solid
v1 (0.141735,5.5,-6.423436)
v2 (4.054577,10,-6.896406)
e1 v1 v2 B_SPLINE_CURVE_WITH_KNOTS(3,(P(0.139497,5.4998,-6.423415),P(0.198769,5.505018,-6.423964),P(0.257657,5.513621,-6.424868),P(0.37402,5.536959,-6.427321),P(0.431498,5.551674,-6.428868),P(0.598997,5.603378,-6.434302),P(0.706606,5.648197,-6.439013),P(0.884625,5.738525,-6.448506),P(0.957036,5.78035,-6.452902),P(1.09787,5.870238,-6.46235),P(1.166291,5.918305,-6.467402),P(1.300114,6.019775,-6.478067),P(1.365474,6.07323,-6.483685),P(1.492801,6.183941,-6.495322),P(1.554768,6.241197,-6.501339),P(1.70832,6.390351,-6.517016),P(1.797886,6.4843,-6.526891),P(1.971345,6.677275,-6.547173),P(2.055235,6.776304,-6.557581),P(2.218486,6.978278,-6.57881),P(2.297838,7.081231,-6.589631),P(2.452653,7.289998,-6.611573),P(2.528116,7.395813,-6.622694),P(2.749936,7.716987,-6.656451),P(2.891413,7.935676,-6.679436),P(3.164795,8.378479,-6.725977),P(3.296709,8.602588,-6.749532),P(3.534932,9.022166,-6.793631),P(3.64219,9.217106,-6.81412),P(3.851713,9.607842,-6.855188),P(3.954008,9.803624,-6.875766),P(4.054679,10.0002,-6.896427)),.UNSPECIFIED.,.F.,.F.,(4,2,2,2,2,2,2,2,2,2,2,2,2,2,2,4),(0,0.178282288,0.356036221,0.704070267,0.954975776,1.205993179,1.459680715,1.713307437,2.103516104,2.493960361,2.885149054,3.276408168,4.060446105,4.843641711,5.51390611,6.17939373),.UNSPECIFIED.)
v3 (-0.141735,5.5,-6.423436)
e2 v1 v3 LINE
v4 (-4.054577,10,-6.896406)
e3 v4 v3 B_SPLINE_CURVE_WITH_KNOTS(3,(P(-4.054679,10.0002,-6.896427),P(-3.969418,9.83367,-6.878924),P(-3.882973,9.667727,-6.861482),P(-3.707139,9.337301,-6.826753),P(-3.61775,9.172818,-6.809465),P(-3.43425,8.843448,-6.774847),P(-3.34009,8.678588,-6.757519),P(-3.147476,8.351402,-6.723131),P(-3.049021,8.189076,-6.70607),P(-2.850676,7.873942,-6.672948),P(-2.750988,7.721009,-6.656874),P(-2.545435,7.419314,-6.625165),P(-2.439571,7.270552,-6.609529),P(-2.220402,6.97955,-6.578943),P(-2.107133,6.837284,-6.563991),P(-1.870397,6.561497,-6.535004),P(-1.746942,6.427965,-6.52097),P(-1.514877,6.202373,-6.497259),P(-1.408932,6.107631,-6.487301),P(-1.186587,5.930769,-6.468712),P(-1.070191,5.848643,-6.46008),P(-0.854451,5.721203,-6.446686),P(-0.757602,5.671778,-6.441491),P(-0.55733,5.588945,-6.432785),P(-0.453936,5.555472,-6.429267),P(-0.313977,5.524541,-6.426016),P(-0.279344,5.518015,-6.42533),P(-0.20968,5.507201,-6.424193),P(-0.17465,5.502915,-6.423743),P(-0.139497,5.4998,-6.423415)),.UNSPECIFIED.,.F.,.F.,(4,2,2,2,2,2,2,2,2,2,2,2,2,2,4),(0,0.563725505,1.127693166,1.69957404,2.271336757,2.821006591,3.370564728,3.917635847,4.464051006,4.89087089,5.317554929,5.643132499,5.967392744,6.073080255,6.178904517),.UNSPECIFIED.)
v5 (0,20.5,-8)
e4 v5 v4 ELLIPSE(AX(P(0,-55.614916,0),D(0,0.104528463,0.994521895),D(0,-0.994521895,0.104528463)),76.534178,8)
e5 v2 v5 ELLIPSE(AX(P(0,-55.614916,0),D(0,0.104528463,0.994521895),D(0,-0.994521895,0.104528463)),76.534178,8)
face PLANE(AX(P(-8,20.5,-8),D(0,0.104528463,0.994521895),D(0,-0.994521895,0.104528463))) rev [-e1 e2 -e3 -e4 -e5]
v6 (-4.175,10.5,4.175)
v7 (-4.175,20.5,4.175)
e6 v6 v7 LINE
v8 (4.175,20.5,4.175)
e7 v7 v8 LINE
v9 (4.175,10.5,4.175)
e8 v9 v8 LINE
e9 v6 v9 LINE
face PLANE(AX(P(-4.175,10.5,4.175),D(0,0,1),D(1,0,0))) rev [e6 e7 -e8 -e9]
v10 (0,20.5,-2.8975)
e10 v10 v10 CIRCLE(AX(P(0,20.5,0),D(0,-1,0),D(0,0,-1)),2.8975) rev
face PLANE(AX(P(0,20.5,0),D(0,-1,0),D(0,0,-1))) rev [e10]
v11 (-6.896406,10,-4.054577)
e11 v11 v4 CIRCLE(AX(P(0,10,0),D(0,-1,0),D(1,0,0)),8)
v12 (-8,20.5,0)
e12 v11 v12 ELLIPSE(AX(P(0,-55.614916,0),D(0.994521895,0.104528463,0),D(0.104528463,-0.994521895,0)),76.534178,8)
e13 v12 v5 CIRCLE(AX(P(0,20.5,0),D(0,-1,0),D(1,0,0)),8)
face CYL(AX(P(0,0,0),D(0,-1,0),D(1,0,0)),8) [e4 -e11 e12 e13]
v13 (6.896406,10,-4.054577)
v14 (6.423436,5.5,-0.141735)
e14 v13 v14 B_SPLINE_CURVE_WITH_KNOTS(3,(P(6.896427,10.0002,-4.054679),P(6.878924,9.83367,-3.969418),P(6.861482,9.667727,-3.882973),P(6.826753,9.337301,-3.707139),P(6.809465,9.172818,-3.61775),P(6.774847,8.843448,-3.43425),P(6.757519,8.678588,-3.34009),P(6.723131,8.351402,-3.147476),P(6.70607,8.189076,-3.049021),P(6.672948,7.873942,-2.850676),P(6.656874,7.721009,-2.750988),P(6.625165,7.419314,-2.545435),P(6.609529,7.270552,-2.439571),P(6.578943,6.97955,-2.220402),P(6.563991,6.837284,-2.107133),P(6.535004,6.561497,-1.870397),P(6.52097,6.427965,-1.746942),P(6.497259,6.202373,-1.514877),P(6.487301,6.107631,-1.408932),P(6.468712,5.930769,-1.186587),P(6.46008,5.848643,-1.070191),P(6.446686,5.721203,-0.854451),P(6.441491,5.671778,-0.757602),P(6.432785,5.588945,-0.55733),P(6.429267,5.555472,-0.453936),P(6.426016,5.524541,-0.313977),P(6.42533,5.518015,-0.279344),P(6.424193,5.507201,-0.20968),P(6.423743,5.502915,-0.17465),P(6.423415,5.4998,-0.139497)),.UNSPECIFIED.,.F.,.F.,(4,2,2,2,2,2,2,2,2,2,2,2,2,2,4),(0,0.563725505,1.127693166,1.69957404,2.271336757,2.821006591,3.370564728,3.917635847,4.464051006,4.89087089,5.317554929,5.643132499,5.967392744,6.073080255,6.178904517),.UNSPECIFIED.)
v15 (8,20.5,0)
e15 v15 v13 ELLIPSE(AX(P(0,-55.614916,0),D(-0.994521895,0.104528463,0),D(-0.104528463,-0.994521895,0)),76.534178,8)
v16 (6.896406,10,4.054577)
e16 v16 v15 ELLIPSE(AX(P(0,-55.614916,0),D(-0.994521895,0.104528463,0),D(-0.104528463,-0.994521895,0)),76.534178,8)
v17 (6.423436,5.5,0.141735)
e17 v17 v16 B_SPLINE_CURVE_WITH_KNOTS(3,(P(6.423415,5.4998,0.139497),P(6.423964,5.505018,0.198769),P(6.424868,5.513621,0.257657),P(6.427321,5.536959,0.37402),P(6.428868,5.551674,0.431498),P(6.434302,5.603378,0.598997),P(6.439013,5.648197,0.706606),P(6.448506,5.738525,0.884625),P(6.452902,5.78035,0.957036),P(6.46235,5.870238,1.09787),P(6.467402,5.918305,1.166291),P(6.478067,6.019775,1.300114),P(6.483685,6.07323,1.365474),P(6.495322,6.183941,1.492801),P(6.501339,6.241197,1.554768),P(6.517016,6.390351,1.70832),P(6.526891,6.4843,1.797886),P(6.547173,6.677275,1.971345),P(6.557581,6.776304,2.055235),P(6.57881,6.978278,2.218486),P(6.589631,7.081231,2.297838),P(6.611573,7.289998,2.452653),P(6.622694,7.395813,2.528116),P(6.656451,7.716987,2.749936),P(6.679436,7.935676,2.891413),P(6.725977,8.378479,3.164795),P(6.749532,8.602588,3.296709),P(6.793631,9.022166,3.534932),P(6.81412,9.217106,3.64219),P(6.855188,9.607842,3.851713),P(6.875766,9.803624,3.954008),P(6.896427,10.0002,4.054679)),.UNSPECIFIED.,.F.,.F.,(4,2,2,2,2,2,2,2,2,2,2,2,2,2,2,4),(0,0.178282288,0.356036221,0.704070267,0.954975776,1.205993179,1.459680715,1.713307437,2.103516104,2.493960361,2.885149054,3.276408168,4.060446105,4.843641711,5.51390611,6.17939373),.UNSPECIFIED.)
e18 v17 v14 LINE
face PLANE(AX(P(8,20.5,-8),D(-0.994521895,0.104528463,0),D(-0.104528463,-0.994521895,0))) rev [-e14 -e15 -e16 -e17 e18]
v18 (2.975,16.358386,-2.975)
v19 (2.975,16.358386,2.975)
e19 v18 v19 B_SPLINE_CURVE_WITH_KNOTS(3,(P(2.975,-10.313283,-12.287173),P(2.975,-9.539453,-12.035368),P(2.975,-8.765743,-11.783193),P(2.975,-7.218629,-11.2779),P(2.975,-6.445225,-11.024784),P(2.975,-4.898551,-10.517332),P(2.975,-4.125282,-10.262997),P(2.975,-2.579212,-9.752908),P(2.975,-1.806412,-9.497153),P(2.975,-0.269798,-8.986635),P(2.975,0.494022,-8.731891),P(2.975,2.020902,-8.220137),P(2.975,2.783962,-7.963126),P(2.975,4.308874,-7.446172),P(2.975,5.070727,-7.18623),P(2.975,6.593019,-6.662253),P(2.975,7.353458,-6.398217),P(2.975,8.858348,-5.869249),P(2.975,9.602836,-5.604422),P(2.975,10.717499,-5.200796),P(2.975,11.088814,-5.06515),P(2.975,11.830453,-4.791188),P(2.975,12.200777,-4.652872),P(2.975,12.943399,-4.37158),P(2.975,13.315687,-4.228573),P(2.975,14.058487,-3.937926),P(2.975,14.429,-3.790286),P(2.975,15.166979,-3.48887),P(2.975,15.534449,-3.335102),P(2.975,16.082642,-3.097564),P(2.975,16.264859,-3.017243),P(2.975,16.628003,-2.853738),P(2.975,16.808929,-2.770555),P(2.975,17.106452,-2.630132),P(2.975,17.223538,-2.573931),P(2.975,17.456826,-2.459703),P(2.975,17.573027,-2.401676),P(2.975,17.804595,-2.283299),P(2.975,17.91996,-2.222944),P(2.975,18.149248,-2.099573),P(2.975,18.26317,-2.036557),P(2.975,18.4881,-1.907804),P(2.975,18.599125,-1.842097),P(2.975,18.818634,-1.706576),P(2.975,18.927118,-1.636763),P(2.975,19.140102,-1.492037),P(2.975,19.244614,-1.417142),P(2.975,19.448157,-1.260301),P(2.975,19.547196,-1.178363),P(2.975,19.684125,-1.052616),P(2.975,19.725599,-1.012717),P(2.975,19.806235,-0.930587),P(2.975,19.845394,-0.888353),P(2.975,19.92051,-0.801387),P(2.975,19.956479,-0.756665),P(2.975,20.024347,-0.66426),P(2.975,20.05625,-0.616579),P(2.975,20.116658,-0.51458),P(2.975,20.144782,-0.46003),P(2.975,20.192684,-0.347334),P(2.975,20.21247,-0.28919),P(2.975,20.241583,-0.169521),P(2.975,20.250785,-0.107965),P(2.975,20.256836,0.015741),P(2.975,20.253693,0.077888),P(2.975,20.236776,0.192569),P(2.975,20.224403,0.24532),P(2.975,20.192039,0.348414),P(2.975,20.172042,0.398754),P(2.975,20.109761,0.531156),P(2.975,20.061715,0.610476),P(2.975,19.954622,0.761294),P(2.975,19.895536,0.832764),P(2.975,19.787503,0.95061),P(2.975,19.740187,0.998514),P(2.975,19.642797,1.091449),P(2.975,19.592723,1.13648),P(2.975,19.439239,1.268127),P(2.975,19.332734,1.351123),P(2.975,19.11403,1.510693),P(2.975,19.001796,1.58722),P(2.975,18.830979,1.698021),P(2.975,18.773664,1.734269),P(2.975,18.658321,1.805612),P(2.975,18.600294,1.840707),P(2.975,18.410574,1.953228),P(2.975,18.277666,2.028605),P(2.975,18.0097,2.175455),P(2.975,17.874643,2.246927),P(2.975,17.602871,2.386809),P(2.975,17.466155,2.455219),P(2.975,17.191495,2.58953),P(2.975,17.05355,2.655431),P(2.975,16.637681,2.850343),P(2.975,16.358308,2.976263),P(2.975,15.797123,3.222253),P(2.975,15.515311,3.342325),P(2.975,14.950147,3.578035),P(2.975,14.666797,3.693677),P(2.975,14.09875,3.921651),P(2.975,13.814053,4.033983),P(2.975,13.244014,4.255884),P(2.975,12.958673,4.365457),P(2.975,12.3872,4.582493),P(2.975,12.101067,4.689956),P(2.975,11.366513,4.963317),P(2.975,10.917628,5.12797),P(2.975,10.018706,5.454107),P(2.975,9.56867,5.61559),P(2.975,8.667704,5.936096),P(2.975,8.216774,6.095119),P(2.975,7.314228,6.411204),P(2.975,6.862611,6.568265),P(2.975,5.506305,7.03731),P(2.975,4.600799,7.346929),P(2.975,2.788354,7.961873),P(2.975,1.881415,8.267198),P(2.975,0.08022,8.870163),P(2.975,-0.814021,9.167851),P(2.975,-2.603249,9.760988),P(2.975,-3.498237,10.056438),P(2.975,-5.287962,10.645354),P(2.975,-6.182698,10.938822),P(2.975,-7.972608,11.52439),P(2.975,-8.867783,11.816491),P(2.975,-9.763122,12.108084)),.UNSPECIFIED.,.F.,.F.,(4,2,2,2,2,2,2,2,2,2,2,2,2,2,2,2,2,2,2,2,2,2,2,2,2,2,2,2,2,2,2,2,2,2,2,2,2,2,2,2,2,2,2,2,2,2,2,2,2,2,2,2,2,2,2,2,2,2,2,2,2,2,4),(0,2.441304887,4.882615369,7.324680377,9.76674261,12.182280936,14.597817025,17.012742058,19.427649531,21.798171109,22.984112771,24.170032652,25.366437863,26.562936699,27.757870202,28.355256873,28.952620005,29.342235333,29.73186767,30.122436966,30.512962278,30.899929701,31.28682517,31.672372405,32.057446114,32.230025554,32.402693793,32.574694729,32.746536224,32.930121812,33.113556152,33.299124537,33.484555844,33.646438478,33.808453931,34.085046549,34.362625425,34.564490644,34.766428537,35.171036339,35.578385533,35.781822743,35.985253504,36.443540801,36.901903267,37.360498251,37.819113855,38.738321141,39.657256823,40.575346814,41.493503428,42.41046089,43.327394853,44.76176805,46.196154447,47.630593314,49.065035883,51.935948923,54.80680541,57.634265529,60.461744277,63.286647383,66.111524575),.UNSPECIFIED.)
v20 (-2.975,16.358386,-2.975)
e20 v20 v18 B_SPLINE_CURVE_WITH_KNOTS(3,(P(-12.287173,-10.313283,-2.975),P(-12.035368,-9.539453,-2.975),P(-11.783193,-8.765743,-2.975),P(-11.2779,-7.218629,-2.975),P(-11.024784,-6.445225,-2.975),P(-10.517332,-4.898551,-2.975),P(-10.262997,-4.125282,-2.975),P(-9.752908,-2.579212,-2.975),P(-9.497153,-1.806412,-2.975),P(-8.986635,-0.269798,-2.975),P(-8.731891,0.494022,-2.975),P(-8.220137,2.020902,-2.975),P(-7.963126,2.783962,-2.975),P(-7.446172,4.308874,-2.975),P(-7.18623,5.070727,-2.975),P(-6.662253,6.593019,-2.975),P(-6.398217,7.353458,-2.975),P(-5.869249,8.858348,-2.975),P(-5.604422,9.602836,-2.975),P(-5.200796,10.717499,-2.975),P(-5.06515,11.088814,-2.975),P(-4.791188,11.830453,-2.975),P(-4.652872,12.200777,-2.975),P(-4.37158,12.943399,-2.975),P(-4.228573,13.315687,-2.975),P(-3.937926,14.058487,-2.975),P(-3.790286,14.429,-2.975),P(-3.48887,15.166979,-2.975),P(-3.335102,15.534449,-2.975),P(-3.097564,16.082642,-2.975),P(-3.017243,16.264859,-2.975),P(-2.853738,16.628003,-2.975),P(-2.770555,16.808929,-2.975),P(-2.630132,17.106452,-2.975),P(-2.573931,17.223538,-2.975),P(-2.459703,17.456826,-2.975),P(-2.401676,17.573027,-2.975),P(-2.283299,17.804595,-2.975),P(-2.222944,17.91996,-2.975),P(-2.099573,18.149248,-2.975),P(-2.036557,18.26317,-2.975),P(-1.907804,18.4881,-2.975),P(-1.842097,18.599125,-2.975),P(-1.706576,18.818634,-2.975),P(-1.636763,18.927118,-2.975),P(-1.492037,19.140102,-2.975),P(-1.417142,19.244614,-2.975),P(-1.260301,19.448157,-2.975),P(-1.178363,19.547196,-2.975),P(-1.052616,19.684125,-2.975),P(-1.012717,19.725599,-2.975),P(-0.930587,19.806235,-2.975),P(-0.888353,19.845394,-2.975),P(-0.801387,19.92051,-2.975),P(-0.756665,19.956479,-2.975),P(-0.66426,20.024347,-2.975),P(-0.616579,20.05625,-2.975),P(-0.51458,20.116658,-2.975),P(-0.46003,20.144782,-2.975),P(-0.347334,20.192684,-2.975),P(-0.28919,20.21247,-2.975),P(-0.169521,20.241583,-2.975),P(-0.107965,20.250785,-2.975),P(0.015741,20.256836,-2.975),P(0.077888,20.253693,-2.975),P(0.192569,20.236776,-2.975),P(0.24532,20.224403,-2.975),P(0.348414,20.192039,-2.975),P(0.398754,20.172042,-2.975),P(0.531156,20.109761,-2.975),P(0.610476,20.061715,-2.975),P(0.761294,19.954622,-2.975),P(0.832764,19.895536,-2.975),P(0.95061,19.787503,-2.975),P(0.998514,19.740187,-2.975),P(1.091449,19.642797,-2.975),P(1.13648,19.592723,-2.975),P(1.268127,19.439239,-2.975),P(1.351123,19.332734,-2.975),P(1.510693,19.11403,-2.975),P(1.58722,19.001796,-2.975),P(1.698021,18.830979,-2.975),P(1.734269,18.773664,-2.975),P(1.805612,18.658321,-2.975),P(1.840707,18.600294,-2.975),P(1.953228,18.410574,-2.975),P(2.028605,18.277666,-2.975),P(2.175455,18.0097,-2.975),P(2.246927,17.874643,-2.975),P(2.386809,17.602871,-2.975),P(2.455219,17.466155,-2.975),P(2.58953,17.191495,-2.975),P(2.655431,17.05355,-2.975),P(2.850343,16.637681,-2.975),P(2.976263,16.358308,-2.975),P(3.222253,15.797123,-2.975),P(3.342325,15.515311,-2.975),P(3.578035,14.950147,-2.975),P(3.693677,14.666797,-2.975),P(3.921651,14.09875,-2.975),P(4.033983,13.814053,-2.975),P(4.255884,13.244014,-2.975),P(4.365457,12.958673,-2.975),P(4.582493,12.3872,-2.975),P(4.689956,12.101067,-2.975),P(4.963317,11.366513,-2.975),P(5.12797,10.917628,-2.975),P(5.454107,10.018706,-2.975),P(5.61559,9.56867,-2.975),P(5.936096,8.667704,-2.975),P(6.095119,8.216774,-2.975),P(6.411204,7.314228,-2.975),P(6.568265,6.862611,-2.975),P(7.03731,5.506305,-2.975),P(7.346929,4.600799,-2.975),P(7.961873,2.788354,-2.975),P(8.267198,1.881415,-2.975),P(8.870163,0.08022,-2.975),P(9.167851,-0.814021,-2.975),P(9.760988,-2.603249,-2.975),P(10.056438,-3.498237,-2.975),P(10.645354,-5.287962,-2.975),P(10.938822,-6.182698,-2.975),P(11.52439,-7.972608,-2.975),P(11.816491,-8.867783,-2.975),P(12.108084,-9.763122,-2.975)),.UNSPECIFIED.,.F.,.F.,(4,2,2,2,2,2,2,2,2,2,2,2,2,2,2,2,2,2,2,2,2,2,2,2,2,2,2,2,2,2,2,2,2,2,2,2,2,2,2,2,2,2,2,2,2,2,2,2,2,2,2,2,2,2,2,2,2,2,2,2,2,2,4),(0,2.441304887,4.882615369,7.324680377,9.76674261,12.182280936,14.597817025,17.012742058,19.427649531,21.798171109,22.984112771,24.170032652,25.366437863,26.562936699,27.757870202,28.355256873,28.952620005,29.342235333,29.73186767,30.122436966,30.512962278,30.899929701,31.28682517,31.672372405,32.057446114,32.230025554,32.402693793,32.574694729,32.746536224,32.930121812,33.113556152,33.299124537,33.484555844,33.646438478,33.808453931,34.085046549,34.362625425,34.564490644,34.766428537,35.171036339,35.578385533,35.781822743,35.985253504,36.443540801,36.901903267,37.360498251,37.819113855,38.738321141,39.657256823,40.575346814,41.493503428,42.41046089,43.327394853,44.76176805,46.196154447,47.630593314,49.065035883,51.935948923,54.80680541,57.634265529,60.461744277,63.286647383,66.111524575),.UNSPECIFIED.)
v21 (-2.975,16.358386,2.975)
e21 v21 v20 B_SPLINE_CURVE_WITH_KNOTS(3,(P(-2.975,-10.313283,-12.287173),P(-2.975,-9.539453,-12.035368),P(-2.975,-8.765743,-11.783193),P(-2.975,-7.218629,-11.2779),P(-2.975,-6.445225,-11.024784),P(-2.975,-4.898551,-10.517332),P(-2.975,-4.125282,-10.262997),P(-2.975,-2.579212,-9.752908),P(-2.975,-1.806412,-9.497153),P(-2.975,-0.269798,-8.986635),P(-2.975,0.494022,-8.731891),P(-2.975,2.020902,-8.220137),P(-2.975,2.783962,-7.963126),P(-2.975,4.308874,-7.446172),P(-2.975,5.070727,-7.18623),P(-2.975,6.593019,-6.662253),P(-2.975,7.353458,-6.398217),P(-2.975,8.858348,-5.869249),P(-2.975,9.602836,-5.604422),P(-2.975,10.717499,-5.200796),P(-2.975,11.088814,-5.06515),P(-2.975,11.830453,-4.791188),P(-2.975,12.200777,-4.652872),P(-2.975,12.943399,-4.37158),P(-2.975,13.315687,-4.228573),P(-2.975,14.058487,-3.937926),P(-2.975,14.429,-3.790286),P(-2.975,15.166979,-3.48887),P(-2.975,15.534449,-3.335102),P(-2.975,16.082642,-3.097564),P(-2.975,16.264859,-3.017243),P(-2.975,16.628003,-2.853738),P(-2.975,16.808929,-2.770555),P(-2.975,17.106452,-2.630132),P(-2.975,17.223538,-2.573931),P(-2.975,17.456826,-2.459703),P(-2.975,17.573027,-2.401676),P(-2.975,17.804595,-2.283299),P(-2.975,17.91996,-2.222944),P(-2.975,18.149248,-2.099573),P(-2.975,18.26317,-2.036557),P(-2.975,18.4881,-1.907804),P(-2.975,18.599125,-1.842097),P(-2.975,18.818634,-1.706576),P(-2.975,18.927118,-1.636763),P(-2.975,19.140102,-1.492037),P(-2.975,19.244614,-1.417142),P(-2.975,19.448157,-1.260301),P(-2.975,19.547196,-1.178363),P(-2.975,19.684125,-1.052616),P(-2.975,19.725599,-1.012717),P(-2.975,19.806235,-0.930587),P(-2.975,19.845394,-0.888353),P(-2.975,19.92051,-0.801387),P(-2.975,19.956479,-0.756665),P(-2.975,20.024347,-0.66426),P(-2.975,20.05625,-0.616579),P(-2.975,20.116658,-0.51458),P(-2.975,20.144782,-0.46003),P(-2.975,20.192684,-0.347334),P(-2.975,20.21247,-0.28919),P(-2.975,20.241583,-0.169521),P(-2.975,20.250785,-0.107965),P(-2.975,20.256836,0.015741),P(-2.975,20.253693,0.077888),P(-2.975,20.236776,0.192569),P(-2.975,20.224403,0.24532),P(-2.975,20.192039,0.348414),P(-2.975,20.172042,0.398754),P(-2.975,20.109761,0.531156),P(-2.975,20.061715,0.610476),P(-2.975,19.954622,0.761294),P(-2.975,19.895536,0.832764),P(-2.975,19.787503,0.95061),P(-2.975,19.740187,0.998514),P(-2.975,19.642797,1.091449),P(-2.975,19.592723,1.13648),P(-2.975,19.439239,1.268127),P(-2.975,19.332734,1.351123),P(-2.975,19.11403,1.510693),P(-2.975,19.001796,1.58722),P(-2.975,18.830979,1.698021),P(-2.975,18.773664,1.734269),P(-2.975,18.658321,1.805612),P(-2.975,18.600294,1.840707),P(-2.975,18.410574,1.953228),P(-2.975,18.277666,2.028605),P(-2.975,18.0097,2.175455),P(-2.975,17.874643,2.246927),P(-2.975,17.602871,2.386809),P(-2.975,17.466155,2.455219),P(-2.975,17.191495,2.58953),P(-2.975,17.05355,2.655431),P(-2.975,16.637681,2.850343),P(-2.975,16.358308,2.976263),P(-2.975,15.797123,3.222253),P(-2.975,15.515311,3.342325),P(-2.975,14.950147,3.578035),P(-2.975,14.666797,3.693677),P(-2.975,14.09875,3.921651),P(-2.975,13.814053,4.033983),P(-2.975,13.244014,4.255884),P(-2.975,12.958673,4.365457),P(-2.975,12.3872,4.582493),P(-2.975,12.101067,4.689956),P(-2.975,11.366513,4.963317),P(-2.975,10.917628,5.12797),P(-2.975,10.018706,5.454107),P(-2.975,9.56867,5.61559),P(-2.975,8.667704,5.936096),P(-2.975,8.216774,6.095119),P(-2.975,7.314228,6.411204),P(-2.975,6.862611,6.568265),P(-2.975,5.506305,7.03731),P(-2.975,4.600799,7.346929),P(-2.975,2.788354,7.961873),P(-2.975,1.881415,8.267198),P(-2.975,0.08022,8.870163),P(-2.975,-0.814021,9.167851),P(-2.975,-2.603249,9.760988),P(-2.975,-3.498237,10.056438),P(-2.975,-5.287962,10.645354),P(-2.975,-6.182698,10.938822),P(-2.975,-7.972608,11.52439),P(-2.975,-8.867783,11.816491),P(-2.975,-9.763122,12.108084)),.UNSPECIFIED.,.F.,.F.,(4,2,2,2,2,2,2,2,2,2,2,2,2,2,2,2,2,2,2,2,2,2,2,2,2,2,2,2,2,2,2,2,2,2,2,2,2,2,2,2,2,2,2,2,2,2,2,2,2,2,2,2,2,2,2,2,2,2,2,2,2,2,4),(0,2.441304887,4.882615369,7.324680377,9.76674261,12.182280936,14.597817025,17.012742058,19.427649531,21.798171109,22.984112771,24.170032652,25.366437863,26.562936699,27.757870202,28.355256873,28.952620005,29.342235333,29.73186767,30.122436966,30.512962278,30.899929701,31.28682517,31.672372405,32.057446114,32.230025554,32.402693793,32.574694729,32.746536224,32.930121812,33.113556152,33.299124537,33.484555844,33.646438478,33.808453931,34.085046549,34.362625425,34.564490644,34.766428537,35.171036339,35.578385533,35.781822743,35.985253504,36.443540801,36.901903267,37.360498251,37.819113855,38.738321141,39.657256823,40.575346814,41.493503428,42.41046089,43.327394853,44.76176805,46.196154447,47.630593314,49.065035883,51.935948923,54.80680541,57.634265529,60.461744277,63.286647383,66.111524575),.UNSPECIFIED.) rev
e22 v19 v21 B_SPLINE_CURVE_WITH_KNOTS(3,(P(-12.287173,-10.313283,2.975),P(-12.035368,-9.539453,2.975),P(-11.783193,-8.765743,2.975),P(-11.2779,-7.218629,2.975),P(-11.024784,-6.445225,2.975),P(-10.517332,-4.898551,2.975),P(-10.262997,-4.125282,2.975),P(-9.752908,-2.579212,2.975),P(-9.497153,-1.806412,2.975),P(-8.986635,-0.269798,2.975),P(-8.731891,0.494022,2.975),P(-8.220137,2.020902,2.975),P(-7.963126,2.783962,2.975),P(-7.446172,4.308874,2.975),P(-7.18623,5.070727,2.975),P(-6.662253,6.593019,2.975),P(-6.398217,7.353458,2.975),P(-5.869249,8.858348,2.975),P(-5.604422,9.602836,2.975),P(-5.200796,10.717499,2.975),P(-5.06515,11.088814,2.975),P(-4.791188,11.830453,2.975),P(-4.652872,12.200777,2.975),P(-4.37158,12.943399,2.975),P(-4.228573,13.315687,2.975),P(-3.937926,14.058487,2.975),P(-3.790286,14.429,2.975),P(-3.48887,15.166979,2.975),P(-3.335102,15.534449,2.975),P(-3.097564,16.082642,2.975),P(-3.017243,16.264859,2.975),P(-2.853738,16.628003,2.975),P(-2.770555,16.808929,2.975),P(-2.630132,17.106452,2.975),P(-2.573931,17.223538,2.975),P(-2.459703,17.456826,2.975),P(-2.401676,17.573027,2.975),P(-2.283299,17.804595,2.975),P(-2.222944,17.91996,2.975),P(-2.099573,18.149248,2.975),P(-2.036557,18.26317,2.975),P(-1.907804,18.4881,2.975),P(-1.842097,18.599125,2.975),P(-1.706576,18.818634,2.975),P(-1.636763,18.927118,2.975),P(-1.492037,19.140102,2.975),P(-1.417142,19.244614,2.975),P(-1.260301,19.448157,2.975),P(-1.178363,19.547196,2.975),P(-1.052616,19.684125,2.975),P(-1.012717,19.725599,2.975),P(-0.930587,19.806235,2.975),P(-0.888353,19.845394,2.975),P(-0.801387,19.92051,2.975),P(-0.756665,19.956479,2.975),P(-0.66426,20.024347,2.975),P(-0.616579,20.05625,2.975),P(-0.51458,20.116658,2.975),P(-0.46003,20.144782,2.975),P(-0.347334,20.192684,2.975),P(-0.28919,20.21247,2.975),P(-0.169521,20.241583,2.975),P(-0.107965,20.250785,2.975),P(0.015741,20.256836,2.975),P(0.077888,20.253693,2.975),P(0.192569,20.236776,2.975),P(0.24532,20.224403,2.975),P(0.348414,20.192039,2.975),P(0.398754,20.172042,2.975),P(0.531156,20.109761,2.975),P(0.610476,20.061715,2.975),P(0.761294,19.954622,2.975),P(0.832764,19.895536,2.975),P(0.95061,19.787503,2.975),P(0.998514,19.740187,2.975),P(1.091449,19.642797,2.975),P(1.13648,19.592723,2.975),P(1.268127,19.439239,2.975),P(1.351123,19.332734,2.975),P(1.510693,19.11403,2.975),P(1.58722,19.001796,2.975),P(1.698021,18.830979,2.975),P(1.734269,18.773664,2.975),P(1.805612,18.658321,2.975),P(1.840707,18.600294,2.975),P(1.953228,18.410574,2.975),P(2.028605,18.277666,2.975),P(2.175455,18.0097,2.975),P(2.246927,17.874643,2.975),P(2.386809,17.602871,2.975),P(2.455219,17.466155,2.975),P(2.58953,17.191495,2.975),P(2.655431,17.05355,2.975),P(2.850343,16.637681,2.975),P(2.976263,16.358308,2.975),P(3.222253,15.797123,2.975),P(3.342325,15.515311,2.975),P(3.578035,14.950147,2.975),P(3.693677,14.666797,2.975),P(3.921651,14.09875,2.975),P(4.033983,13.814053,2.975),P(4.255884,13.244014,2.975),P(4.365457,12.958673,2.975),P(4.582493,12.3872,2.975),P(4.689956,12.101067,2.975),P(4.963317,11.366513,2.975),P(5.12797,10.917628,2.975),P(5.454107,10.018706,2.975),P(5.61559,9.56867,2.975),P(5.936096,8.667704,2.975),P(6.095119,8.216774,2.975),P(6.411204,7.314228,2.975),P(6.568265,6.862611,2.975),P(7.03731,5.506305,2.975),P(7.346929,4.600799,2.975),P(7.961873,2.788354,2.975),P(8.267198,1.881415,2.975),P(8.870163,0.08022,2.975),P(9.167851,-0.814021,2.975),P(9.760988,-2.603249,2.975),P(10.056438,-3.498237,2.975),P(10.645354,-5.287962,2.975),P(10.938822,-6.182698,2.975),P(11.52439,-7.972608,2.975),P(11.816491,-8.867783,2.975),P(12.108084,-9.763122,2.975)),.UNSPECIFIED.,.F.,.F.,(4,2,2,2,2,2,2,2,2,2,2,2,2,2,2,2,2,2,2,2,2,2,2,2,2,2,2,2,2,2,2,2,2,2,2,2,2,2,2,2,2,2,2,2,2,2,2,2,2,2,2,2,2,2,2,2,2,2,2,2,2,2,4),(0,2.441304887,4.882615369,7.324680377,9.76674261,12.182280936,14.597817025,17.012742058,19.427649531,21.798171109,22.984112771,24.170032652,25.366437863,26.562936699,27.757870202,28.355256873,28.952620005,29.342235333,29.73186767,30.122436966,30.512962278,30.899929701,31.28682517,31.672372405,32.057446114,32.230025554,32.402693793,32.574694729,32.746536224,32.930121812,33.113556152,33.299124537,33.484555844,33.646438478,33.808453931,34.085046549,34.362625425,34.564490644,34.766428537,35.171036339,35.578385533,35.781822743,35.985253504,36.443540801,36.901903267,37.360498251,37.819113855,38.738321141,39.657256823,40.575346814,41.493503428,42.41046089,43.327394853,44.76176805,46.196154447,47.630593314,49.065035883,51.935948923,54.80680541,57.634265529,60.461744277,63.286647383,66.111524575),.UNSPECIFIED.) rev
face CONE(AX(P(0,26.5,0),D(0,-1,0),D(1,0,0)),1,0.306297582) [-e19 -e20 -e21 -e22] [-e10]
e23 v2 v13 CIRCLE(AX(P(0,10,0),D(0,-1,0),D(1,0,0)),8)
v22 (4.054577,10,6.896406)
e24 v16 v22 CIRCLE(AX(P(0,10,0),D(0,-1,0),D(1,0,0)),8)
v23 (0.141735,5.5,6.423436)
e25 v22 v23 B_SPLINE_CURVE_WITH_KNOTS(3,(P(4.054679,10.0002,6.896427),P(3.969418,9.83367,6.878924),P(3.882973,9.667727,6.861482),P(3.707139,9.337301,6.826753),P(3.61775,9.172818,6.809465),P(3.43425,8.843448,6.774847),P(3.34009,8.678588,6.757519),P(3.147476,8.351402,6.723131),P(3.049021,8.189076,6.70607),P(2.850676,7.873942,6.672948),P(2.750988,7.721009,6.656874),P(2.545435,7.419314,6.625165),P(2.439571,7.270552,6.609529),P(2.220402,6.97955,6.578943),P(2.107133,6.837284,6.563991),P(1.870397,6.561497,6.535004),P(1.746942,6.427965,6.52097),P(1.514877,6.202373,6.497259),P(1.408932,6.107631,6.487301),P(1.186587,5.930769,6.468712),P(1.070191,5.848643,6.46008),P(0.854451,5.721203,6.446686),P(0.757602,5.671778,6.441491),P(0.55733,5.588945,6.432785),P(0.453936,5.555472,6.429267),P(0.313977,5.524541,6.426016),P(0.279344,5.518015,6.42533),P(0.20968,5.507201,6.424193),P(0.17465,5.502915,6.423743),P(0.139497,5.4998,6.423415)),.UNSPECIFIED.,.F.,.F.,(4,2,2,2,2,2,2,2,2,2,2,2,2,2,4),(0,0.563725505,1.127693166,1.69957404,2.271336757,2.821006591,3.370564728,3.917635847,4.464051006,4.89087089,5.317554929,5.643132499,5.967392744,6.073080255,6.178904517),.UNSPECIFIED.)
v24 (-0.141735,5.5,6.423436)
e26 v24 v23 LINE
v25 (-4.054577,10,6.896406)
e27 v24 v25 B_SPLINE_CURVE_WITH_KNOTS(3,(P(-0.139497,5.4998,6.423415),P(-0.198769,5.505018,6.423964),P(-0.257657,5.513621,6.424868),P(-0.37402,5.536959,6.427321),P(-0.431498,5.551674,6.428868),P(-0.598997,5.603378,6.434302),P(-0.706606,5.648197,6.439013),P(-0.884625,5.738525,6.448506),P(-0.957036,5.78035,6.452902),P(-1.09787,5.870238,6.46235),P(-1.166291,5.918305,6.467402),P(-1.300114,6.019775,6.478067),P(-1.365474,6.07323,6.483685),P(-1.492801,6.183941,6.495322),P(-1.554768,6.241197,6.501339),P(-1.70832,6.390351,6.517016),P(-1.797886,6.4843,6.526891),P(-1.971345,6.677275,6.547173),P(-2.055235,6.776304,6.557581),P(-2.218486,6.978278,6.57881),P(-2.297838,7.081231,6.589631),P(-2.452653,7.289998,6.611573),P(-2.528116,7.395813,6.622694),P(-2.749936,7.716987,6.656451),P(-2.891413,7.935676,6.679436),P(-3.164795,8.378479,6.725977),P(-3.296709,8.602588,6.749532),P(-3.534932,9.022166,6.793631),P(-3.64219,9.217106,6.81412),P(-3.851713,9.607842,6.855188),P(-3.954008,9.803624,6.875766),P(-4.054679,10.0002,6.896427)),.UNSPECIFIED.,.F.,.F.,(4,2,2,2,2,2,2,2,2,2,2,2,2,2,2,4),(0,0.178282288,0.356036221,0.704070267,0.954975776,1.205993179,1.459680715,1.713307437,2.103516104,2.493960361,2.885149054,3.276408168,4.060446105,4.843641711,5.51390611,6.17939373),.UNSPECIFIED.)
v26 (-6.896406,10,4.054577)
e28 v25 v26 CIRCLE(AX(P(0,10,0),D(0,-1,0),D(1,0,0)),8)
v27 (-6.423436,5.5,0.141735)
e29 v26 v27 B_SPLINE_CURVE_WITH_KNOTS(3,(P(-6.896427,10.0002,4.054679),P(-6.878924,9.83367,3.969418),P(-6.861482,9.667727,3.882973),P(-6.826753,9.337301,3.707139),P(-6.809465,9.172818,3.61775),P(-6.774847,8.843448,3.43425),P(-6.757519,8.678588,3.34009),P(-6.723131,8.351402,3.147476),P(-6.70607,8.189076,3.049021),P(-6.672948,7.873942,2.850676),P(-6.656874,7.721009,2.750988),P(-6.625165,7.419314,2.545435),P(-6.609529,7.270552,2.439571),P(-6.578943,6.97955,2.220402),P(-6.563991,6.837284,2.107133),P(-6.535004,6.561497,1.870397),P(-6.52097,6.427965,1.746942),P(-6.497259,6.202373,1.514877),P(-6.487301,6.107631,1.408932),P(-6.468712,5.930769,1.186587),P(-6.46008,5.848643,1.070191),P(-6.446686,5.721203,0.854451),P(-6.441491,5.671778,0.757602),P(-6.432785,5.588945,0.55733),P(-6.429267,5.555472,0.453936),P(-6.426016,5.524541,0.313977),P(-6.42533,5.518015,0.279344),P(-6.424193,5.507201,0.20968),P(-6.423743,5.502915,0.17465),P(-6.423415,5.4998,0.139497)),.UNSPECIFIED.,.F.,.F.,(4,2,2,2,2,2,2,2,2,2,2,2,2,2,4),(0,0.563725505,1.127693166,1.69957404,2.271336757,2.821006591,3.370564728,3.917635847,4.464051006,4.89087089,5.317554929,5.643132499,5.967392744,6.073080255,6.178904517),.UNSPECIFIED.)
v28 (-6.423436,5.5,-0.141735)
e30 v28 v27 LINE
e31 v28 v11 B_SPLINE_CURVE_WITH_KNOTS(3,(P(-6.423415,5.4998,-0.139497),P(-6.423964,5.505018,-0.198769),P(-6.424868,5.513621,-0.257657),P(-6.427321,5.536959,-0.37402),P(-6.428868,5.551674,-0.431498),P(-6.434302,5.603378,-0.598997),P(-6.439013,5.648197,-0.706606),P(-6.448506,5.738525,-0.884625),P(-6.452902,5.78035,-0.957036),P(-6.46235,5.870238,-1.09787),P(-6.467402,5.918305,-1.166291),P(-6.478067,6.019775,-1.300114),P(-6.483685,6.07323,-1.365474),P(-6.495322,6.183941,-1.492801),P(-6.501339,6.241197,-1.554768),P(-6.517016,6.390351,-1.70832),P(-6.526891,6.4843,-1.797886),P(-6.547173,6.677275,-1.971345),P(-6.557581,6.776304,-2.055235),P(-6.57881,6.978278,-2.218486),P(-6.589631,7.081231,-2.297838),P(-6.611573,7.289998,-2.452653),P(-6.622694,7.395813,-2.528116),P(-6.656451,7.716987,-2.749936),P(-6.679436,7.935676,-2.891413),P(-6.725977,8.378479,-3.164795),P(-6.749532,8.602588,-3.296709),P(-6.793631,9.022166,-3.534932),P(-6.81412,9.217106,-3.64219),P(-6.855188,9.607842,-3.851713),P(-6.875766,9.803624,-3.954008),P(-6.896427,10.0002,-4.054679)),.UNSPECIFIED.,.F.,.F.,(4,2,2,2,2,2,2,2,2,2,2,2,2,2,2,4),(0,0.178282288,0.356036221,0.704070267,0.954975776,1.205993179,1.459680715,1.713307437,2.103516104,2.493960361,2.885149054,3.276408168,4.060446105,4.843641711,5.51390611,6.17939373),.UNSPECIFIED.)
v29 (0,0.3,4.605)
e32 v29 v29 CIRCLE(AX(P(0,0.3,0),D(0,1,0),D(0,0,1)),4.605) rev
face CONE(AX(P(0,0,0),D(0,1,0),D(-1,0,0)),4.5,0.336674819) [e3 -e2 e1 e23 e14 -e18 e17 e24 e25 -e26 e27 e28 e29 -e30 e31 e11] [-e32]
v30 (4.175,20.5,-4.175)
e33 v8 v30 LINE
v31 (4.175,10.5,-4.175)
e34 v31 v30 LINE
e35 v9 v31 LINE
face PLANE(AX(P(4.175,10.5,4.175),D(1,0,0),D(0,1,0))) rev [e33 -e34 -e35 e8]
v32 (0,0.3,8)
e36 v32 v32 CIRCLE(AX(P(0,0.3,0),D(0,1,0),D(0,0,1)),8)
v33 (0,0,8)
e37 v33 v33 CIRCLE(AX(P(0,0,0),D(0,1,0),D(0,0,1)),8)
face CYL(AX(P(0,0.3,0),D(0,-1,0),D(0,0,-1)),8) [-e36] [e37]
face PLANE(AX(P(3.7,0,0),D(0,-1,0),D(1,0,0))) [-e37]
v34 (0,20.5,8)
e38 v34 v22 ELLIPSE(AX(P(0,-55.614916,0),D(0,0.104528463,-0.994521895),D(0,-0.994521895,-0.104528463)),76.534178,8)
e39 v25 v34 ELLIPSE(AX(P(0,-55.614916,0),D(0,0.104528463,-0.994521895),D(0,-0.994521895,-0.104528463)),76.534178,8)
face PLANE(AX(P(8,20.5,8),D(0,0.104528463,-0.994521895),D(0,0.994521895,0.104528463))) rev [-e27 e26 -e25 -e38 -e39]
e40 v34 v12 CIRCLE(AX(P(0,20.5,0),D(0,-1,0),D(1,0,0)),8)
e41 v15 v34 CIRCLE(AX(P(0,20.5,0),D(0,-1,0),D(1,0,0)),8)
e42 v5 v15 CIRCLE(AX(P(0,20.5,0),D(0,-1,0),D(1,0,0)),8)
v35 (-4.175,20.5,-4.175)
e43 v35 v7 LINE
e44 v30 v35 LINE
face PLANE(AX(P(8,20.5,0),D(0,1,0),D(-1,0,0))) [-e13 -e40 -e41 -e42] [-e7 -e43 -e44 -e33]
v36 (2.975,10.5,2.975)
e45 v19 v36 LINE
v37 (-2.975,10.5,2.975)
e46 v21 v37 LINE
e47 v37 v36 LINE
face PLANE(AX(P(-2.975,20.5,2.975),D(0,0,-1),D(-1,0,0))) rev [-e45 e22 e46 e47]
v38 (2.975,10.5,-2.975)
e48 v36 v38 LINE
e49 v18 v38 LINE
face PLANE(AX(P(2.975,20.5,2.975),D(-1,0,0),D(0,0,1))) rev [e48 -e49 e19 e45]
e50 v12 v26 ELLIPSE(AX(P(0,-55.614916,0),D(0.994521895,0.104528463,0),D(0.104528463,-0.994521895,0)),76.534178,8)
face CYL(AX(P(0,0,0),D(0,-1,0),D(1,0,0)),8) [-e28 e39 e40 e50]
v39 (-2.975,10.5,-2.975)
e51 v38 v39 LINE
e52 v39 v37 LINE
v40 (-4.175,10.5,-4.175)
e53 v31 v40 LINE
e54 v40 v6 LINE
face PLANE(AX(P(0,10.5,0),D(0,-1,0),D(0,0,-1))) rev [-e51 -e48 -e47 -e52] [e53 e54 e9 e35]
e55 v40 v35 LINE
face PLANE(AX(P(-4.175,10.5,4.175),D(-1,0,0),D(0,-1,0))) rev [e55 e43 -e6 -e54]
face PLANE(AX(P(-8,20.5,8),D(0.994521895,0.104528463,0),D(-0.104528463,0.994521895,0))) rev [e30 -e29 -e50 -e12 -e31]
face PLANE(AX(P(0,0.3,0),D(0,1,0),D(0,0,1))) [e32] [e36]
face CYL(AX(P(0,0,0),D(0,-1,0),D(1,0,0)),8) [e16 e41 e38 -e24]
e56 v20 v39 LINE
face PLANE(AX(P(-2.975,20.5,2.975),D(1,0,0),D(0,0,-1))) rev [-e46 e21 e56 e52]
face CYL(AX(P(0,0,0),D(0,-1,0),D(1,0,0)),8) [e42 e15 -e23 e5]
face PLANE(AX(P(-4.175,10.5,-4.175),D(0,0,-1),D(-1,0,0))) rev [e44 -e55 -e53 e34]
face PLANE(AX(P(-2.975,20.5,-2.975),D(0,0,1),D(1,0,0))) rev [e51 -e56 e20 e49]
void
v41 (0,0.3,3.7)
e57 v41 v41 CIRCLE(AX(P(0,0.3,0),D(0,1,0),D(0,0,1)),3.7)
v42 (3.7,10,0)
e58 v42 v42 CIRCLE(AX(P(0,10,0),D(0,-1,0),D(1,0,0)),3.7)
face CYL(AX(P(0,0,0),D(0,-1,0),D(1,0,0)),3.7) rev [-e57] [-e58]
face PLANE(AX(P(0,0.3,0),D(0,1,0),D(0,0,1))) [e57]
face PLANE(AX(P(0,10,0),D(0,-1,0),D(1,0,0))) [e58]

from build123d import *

# Parameters (mm, degrees)
SKETCH2_W           = 8.35
SKETCH2_H           = 8.35
CUT_EXTRUDE1_DEPTH  = 10
SKETCH3_W           = 5.95
SKETCH3_H           = 5.95
BOSS_EXTRUDE1_DEPTH = 10
SKETCH6_W           = 20
SKETCH6_H           = 20
SKETCH6_W_2         = 16
SKETCH6_H_2         = 16
CUT_EXTRUDE2_DEPTH  = 15
CUT_EXTRUDE2_DRAFT  = 6
BOSS_EXTRUDE2_START = 0.3
SKETCH5_R           = 8
BOSS_EXTRUDE2_DEPTH = 0.3


with BuildPart() as part:
    # Sketch1 → Revolve1 (revolve)
    with BuildSketch(Plane.XY):
        Polygon((3.7, 10), (3.7, 0), (4.5, 0), (8, 10), (8, 20.5), (0, 20.5), (0, 10), align=None)
    revolve(axis=Axis((0, 0, 0), (0, 1, 0)))

    # Sketch2 → Cut-Extrude1 (cut)
    with BuildSketch(Plane(origin=(0, 20.5, 0), x_dir=(1, 0, 0), z_dir=(0, 1, 0))):
        Rectangle(SKETCH2_W, SKETCH2_H)
    extrude(amount=-CUT_EXTRUDE1_DEPTH, mode=Mode.SUBTRACT)


with BuildPart() as body_2:
    # Sketch3 → Boss-Extrude1 (new body)
    with BuildSketch(Plane(origin=(0, 10.5, 0), x_dir=(1, 0, 0), z_dir=(0, 1, 0))):
        Rectangle(SKETCH3_W, SKETCH3_H)
    extrude(amount=BOSS_EXTRUDE1_DEPTH)

    # Sketch4 → Cut-Revolve1 (revolve, cut)
    with BuildSketch(Plane.XY, mode=Mode.PRIVATE) as cut_revolve1_sk:
        Polygon((1, 26.5), (7.325, 6.5), (7.325, 26.5), align=None)
    revolve(cut_revolve1_sk.sketch.rotate(Axis((0, 20.5, 0), (0, 1, 0)), 315.000122561), axis=Axis((0, 20.5, 0), (0, 1, 0)), mode=Mode.SUBTRACT)


with BuildPart() as cut_extrude2_tool:
    # Sketch6 → Cut-Extrude2 (with draft: the straight prism first)
    with BuildSketch(Plane(origin=(0, 20.5, 0), x_dir=(1, 0, 0), z_dir=(0, 1, 0))):
        Rectangle(SKETCH6_W, SKETCH6_H)
        Rectangle(SKETCH6_W_2, SKETCH6_H_2, mode=Mode.SUBTRACT)
    extrude(amount=-CUT_EXTRUDE2_DEPTH)
    # Cut-Extrude2: the draft: its side faces are tilted about the plane it starts from
    cut_extrude2_sides = [cut_extrude2_tool.faces().sort_by_distance(p)[0] for p in [
        (-10, 13, 0),
        (0, 13, 10),
        (10, 13, 0),
        (0, 13, -10),
        (0, 13, -8),
        (8, 13, 0),
        (0, 13, 8),
        (-8, 13, 0),
    ]]
    draft(cut_extrude2_sides, Plane(origin=(0, 20.5, 0), x_dir=(1, 0, 0), z_dir=(0, 1, 0)), CUT_EXTRUDE2_DRAFT)


with BuildPart() as part_1:
    add(part.part)

    # Cut-Extrude2: cut by cut_extrude2_tool
    add(cut_extrude2_tool.part, mode=Mode.SUBTRACT)

    # Intersect2: read off the stored shape, not the designer's step
    # Intersect2: union body 2
    add(body_2.part)

    # Sketch5 → Boss-Extrude2 (add)
    with BuildSketch(Plane(origin=(0, 0, 0), x_dir=(1, 0, 0), z_dir=(0, 1, 0)).offset(BOSS_EXTRUDE2_START)):
        with Locations(Location((0, 0, 0), (0, 0, 270))):
            Circle(SKETCH5_R)
    extrude(amount=-BOSS_EXTRUDE2_DEPTH)


solid = part_1.part
